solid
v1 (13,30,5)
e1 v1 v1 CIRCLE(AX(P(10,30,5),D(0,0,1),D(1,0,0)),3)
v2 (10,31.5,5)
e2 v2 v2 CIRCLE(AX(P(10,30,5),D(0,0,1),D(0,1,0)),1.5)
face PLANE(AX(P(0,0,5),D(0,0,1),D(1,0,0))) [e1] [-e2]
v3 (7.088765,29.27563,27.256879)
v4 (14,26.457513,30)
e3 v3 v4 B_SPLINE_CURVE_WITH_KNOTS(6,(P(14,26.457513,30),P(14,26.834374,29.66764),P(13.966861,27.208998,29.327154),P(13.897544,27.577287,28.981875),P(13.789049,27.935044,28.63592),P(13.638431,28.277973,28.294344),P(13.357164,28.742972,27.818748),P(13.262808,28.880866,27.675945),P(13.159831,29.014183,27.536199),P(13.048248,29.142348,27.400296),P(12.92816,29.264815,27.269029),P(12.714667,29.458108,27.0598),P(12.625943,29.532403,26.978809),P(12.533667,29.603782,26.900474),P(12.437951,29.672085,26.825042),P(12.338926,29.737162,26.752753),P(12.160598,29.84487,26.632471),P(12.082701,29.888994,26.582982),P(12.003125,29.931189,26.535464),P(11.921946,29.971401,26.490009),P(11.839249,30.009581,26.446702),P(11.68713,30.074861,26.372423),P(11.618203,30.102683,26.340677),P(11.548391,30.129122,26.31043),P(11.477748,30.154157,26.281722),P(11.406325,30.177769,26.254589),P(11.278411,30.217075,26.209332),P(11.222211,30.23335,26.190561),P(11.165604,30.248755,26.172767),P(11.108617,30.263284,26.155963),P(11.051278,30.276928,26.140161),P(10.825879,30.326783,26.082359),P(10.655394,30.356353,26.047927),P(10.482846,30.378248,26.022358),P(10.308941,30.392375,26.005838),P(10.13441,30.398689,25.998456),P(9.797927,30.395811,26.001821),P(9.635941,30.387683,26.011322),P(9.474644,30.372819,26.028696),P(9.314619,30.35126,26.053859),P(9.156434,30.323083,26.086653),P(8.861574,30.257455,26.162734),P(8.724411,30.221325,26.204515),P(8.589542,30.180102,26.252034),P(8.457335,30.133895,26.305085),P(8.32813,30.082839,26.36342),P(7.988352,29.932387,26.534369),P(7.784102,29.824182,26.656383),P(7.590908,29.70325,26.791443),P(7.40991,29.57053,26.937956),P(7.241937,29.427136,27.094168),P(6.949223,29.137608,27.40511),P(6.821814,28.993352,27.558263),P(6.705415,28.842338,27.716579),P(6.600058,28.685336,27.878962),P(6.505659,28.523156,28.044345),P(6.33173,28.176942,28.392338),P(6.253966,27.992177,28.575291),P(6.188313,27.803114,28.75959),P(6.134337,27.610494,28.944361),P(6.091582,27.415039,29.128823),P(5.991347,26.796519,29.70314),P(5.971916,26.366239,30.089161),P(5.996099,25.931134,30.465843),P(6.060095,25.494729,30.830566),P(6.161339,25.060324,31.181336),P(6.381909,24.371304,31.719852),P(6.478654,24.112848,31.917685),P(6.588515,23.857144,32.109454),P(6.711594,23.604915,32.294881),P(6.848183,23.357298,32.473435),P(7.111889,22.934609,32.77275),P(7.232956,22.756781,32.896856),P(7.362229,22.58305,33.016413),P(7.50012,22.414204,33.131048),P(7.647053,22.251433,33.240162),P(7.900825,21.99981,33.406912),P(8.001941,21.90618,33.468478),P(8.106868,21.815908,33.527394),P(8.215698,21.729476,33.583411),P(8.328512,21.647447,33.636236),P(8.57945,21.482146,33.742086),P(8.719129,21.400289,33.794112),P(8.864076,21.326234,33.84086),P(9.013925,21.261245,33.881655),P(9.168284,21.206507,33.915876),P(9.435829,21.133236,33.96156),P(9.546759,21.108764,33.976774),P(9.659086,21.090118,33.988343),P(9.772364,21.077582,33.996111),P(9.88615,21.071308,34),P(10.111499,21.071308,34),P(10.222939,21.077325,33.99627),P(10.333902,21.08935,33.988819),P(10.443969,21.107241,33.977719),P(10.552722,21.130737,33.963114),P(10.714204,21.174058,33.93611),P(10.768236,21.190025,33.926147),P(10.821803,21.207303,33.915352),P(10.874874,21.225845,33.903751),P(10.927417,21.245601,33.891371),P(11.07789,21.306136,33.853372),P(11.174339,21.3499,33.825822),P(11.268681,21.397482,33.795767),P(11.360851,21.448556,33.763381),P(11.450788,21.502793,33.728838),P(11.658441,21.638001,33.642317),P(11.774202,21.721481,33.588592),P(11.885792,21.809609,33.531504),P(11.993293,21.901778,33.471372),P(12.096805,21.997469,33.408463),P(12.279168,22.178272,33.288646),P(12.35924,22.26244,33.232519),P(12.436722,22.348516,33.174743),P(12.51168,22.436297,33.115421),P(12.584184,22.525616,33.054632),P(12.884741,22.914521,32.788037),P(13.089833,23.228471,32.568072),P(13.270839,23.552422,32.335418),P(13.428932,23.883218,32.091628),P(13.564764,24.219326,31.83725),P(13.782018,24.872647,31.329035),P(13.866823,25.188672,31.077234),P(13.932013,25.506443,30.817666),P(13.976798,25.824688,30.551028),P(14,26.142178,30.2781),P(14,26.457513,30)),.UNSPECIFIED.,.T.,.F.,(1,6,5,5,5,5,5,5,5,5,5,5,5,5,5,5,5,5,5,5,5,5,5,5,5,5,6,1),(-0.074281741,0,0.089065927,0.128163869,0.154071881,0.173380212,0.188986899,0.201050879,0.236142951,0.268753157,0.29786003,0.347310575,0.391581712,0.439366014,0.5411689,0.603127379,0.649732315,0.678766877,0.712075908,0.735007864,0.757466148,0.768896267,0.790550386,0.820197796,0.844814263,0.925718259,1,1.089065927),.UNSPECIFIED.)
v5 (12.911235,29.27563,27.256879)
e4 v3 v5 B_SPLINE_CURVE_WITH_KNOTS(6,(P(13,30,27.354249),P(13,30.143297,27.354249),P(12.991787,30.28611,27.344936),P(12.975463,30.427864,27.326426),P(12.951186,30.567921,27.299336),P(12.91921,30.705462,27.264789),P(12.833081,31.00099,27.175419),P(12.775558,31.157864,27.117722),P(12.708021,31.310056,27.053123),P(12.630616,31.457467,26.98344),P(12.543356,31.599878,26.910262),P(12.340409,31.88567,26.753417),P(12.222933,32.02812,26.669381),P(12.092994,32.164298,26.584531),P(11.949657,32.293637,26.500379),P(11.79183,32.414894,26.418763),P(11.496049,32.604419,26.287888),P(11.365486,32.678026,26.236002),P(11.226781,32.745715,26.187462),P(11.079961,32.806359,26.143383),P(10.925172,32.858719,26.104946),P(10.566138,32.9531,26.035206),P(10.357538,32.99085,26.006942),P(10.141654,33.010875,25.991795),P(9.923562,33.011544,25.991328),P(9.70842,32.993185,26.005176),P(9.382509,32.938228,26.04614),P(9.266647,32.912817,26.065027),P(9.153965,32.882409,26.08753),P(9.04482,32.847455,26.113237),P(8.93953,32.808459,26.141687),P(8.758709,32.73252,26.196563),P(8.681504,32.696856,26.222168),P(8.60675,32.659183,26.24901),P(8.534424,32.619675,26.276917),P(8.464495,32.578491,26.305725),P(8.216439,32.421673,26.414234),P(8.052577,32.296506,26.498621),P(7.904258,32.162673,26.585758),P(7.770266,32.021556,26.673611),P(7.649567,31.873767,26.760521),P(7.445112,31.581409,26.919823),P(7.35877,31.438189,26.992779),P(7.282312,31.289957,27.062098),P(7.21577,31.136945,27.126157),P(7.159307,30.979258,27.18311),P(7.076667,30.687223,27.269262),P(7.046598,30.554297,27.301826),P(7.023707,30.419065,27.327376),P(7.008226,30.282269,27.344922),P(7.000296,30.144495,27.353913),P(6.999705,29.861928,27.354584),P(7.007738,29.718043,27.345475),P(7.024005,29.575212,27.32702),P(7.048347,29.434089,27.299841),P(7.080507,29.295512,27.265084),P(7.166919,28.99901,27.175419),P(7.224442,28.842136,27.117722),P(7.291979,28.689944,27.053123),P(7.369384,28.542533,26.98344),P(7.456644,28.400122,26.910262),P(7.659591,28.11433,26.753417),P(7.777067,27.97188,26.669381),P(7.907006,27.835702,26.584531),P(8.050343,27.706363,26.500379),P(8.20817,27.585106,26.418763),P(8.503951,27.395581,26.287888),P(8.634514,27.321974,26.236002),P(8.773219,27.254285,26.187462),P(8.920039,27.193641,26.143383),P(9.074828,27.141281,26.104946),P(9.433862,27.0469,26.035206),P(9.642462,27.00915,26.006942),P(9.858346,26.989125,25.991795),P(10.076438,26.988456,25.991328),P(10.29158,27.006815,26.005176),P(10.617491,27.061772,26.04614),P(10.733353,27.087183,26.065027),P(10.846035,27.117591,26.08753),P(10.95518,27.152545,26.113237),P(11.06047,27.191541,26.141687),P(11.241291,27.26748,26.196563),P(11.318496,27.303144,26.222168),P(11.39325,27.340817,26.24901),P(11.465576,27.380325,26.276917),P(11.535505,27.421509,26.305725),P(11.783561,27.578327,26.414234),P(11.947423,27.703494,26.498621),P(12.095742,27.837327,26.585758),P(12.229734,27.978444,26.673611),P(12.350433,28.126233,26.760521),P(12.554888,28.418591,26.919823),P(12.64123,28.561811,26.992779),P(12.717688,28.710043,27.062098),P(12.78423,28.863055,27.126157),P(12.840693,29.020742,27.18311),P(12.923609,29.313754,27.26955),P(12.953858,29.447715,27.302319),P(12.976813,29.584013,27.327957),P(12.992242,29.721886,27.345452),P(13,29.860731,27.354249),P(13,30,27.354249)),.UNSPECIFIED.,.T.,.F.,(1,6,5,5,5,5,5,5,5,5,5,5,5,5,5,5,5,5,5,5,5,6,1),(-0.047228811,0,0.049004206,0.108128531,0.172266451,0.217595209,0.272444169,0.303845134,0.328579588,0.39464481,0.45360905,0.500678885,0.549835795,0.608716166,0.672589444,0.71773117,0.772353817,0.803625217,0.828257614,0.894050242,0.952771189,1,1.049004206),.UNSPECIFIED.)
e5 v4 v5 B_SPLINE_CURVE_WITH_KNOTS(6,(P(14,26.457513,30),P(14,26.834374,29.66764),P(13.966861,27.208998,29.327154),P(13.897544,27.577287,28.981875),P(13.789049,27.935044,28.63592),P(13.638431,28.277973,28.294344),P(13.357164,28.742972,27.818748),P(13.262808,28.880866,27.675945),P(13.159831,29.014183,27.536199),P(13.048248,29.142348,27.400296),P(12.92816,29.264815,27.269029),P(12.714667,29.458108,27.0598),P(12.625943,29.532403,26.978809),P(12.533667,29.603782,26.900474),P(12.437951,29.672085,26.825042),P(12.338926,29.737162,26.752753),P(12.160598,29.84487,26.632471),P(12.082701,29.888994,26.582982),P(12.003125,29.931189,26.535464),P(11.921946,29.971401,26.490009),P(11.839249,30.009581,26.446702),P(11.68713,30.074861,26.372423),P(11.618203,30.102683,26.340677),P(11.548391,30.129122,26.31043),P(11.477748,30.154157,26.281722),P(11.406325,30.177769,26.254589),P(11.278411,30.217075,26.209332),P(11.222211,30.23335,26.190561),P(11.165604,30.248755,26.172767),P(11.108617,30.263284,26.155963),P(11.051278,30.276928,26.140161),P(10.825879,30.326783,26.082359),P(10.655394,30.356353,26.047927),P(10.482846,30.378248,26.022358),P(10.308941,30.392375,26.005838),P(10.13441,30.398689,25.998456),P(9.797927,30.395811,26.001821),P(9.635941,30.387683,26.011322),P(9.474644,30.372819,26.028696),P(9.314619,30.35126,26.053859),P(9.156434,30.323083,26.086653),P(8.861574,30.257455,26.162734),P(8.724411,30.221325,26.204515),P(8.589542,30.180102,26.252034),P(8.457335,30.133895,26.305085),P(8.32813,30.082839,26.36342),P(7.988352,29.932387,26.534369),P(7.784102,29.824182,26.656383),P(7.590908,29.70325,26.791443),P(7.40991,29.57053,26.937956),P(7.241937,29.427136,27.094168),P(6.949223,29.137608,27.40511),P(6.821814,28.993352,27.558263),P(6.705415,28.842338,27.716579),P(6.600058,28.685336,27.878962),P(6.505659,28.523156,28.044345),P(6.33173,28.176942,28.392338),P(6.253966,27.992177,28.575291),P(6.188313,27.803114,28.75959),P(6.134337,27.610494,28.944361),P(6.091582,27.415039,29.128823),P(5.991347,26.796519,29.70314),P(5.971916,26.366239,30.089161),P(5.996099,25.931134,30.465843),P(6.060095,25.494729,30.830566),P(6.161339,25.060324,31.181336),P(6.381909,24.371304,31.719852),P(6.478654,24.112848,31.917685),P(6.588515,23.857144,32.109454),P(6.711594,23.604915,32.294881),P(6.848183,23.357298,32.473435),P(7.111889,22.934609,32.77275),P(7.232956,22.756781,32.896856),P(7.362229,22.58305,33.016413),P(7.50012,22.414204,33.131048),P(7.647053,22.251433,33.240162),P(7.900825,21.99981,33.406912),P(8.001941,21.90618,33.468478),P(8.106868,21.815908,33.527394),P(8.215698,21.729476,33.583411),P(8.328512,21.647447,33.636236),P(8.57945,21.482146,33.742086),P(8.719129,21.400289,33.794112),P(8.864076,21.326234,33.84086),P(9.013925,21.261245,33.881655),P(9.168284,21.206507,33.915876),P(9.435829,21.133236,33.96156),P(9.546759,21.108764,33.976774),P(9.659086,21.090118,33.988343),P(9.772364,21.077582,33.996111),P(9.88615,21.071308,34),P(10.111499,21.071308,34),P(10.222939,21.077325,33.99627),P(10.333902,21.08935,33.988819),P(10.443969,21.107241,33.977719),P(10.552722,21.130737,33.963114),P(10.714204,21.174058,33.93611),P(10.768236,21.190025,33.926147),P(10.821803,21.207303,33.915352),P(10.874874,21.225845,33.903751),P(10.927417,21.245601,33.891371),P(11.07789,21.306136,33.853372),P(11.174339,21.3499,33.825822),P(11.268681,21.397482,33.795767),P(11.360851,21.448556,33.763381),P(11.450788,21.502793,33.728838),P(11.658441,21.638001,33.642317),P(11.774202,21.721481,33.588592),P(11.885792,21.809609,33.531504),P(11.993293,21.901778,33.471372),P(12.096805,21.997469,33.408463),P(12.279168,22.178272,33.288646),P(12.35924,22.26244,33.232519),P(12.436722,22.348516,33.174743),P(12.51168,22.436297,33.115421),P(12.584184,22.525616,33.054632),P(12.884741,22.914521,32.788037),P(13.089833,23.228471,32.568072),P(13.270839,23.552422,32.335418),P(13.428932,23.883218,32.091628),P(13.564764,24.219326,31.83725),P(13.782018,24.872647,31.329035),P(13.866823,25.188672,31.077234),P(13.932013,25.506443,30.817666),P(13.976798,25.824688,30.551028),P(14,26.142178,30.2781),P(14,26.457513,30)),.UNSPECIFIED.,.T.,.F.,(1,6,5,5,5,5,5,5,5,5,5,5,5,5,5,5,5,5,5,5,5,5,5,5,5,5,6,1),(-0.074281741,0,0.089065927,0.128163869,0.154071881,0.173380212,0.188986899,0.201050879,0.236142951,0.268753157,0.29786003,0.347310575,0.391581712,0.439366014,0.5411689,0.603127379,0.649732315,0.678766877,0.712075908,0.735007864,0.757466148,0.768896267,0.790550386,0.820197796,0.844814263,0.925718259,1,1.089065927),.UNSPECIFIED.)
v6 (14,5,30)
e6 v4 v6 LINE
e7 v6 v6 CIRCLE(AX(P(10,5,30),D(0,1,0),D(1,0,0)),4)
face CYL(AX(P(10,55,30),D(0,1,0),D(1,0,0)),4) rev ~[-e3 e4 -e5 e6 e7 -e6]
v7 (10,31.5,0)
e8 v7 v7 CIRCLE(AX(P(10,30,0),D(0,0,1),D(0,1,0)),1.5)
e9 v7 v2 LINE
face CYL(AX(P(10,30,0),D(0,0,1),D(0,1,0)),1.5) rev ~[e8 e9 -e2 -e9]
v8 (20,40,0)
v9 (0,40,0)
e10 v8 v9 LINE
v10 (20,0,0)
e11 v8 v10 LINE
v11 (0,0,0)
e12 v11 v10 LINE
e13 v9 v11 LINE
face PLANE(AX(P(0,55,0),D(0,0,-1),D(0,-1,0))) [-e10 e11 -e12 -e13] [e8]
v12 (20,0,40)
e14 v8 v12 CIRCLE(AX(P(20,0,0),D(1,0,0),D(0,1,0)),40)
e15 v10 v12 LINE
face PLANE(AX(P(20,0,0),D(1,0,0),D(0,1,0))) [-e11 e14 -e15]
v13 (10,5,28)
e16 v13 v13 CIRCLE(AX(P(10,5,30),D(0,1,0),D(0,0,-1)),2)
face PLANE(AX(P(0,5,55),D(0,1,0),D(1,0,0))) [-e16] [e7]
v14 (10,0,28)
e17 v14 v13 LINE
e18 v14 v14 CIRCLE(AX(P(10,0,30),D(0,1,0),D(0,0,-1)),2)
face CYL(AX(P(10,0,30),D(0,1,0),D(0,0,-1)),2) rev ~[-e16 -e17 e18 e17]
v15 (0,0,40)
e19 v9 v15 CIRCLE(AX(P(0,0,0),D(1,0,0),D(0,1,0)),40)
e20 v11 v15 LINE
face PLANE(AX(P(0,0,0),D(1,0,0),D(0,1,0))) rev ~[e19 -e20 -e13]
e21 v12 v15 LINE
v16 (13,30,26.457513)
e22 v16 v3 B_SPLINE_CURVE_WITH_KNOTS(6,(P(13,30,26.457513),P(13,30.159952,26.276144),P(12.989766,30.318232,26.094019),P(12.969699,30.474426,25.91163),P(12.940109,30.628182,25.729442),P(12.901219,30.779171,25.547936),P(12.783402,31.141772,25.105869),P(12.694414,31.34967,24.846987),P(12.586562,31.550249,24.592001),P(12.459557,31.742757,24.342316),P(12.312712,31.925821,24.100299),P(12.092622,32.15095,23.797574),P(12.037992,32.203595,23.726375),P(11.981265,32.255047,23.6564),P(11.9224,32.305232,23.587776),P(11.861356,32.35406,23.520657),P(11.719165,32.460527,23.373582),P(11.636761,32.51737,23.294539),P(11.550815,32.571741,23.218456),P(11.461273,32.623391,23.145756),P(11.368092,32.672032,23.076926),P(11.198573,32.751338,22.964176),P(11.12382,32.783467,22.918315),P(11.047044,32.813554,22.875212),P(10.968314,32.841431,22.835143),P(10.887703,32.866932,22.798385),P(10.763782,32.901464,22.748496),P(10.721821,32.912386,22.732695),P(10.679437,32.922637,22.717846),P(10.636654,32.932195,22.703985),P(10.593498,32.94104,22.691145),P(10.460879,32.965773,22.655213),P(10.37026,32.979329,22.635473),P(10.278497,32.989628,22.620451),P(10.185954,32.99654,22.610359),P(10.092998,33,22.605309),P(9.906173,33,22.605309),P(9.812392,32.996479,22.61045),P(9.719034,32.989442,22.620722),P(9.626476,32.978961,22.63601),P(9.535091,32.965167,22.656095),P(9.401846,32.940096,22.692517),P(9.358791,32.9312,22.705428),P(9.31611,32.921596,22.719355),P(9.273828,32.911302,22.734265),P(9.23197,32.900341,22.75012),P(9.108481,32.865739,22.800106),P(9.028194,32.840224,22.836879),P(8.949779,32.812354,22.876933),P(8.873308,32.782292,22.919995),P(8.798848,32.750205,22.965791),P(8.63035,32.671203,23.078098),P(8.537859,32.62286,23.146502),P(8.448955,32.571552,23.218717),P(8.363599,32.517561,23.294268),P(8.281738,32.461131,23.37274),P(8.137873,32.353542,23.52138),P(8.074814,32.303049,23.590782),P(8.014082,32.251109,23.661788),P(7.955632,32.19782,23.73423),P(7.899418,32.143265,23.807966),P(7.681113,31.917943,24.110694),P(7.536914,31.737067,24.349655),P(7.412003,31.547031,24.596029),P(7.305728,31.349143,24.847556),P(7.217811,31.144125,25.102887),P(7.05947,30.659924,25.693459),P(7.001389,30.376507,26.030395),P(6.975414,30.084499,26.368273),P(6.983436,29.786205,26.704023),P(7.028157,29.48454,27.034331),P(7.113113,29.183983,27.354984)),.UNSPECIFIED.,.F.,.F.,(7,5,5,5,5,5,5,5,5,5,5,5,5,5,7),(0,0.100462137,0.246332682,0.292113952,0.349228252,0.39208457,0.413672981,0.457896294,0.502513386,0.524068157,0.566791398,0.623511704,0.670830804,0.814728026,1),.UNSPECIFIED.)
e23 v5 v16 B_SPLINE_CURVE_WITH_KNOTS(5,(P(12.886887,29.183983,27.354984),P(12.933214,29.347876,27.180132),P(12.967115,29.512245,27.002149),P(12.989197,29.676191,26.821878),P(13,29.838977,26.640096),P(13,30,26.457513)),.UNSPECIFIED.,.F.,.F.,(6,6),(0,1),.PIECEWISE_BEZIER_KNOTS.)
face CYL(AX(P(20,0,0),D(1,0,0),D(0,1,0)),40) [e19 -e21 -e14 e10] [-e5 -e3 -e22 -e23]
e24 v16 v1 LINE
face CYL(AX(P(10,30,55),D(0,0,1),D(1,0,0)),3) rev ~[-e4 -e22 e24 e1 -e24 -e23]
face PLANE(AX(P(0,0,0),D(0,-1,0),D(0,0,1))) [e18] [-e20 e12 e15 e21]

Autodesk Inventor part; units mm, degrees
ref_plane "YZ Plane" through (0, 0, 0) normal (1, 0, 0) x (0, 1, 0)
ref_plane "XZ Plane" through (0, 0, 0) normal (0, 1, 0) x (-1, 0, 0)
ref_plane "XY Plane" through (0, 0, 0) normal (0, 0, 1) x (1, 0, 0)
sketch "草圖1" plane through (0, 0, 0) normal (1, 0, 0) x (0, 1, 0)
  line L0 (0, 0) -> (0, 65)
  line L1 (0, 65) -> (65, 0)
  line L2 (65, 0) -> (0, 0)
  line L3 (10, 55) -> (0, 55)
  line L4 (55, 10) -> (55, 0)
  line L5 (55, 10) -> (55, 55)
  line L6 (55, 55) -> (10, 55)
  dimension "d0" = 65
  dimension "d1" = 65
  dimension "d20" = 55
extrude "擠出1" add sketch "草圖1" along normal blind 20 contours L0 L3 L1 L4 L2 | L6 L5 L1
sketch "草圖2" plane through (0, 0, 0) normal (0, -1, 0) x (1, 0, 0)
  line L0 (0, 0) -> (20, 0) projected
  point P0 (10, 30)
  point P1 (10, 0)
  dimension "d4" = 30
hole "孔1" at (10, 0, 30) direction (0, 1, 0) diameter 4 end through all
sketch "草圖3" plane through (0, 0, 0) normal (0, 0, -1) x (-1, 0, 0)
  line L0 (0, 0) -> (-20, 0) projected
  point P0 (-10, 30)
  point P1 (-10, 0)
  dimension "d12" = 30
hole "孔2" at (10, 30, 0) direction (0, 0, 1) diameter 3 end through all
sketch "草圖6" plane through (0, 55, 55) normal (0, 1, 0) x (1, 0, 0)
  circle A0 centre (10, 25) radius 2 projected
  circle A1 centre (10, 25) radius 4
  point P0 (0, 55)
  dimension "d27" = 8
extrude "擠出4" cut sketch "草圖6" against normal blind 50
sketch "草圖7" plane through (0, 0, 55) normal (0, 0, 1) x (1, 0, 0)
  circle A0 centre (10, 30) radius 1.5 projected
  circle A1 centre (10, 30) radius 1.5 projected
  circle A2 centre (10, 30) radius 3
  point P0 (0, 0)
  dimension "d30" = 6
extrude "擠出5" cut sketch "草圖7" against normal blind 50
sketch "草圖8" plane through (20, 0, 0) normal (1, 0, 0) x (0, 0, -1)
  line L0 (0, 0) -> (0, 55) projected
  line L1 (-55, 0) -> (0, 0) projected
  arc A0 (0, 40) -> (-40, 0) centre (0, 0) ccw
  line L2 (-55, 55) -> (-55, 0) projected
  line L3 (-55, 0) -> (0, 0) projected
  line L4 (0, 0) -> (0, 55) projected
  line L5 (0, 55) -> (-55, 55) projected
  dimension "d34" = 40
extrude "擠出6" cut sketch "草圖8" against normal through all contours A0 L1 L2 L5 L0
equation "\"d1\" = d0"
properties part number "鋁擠固定器"
